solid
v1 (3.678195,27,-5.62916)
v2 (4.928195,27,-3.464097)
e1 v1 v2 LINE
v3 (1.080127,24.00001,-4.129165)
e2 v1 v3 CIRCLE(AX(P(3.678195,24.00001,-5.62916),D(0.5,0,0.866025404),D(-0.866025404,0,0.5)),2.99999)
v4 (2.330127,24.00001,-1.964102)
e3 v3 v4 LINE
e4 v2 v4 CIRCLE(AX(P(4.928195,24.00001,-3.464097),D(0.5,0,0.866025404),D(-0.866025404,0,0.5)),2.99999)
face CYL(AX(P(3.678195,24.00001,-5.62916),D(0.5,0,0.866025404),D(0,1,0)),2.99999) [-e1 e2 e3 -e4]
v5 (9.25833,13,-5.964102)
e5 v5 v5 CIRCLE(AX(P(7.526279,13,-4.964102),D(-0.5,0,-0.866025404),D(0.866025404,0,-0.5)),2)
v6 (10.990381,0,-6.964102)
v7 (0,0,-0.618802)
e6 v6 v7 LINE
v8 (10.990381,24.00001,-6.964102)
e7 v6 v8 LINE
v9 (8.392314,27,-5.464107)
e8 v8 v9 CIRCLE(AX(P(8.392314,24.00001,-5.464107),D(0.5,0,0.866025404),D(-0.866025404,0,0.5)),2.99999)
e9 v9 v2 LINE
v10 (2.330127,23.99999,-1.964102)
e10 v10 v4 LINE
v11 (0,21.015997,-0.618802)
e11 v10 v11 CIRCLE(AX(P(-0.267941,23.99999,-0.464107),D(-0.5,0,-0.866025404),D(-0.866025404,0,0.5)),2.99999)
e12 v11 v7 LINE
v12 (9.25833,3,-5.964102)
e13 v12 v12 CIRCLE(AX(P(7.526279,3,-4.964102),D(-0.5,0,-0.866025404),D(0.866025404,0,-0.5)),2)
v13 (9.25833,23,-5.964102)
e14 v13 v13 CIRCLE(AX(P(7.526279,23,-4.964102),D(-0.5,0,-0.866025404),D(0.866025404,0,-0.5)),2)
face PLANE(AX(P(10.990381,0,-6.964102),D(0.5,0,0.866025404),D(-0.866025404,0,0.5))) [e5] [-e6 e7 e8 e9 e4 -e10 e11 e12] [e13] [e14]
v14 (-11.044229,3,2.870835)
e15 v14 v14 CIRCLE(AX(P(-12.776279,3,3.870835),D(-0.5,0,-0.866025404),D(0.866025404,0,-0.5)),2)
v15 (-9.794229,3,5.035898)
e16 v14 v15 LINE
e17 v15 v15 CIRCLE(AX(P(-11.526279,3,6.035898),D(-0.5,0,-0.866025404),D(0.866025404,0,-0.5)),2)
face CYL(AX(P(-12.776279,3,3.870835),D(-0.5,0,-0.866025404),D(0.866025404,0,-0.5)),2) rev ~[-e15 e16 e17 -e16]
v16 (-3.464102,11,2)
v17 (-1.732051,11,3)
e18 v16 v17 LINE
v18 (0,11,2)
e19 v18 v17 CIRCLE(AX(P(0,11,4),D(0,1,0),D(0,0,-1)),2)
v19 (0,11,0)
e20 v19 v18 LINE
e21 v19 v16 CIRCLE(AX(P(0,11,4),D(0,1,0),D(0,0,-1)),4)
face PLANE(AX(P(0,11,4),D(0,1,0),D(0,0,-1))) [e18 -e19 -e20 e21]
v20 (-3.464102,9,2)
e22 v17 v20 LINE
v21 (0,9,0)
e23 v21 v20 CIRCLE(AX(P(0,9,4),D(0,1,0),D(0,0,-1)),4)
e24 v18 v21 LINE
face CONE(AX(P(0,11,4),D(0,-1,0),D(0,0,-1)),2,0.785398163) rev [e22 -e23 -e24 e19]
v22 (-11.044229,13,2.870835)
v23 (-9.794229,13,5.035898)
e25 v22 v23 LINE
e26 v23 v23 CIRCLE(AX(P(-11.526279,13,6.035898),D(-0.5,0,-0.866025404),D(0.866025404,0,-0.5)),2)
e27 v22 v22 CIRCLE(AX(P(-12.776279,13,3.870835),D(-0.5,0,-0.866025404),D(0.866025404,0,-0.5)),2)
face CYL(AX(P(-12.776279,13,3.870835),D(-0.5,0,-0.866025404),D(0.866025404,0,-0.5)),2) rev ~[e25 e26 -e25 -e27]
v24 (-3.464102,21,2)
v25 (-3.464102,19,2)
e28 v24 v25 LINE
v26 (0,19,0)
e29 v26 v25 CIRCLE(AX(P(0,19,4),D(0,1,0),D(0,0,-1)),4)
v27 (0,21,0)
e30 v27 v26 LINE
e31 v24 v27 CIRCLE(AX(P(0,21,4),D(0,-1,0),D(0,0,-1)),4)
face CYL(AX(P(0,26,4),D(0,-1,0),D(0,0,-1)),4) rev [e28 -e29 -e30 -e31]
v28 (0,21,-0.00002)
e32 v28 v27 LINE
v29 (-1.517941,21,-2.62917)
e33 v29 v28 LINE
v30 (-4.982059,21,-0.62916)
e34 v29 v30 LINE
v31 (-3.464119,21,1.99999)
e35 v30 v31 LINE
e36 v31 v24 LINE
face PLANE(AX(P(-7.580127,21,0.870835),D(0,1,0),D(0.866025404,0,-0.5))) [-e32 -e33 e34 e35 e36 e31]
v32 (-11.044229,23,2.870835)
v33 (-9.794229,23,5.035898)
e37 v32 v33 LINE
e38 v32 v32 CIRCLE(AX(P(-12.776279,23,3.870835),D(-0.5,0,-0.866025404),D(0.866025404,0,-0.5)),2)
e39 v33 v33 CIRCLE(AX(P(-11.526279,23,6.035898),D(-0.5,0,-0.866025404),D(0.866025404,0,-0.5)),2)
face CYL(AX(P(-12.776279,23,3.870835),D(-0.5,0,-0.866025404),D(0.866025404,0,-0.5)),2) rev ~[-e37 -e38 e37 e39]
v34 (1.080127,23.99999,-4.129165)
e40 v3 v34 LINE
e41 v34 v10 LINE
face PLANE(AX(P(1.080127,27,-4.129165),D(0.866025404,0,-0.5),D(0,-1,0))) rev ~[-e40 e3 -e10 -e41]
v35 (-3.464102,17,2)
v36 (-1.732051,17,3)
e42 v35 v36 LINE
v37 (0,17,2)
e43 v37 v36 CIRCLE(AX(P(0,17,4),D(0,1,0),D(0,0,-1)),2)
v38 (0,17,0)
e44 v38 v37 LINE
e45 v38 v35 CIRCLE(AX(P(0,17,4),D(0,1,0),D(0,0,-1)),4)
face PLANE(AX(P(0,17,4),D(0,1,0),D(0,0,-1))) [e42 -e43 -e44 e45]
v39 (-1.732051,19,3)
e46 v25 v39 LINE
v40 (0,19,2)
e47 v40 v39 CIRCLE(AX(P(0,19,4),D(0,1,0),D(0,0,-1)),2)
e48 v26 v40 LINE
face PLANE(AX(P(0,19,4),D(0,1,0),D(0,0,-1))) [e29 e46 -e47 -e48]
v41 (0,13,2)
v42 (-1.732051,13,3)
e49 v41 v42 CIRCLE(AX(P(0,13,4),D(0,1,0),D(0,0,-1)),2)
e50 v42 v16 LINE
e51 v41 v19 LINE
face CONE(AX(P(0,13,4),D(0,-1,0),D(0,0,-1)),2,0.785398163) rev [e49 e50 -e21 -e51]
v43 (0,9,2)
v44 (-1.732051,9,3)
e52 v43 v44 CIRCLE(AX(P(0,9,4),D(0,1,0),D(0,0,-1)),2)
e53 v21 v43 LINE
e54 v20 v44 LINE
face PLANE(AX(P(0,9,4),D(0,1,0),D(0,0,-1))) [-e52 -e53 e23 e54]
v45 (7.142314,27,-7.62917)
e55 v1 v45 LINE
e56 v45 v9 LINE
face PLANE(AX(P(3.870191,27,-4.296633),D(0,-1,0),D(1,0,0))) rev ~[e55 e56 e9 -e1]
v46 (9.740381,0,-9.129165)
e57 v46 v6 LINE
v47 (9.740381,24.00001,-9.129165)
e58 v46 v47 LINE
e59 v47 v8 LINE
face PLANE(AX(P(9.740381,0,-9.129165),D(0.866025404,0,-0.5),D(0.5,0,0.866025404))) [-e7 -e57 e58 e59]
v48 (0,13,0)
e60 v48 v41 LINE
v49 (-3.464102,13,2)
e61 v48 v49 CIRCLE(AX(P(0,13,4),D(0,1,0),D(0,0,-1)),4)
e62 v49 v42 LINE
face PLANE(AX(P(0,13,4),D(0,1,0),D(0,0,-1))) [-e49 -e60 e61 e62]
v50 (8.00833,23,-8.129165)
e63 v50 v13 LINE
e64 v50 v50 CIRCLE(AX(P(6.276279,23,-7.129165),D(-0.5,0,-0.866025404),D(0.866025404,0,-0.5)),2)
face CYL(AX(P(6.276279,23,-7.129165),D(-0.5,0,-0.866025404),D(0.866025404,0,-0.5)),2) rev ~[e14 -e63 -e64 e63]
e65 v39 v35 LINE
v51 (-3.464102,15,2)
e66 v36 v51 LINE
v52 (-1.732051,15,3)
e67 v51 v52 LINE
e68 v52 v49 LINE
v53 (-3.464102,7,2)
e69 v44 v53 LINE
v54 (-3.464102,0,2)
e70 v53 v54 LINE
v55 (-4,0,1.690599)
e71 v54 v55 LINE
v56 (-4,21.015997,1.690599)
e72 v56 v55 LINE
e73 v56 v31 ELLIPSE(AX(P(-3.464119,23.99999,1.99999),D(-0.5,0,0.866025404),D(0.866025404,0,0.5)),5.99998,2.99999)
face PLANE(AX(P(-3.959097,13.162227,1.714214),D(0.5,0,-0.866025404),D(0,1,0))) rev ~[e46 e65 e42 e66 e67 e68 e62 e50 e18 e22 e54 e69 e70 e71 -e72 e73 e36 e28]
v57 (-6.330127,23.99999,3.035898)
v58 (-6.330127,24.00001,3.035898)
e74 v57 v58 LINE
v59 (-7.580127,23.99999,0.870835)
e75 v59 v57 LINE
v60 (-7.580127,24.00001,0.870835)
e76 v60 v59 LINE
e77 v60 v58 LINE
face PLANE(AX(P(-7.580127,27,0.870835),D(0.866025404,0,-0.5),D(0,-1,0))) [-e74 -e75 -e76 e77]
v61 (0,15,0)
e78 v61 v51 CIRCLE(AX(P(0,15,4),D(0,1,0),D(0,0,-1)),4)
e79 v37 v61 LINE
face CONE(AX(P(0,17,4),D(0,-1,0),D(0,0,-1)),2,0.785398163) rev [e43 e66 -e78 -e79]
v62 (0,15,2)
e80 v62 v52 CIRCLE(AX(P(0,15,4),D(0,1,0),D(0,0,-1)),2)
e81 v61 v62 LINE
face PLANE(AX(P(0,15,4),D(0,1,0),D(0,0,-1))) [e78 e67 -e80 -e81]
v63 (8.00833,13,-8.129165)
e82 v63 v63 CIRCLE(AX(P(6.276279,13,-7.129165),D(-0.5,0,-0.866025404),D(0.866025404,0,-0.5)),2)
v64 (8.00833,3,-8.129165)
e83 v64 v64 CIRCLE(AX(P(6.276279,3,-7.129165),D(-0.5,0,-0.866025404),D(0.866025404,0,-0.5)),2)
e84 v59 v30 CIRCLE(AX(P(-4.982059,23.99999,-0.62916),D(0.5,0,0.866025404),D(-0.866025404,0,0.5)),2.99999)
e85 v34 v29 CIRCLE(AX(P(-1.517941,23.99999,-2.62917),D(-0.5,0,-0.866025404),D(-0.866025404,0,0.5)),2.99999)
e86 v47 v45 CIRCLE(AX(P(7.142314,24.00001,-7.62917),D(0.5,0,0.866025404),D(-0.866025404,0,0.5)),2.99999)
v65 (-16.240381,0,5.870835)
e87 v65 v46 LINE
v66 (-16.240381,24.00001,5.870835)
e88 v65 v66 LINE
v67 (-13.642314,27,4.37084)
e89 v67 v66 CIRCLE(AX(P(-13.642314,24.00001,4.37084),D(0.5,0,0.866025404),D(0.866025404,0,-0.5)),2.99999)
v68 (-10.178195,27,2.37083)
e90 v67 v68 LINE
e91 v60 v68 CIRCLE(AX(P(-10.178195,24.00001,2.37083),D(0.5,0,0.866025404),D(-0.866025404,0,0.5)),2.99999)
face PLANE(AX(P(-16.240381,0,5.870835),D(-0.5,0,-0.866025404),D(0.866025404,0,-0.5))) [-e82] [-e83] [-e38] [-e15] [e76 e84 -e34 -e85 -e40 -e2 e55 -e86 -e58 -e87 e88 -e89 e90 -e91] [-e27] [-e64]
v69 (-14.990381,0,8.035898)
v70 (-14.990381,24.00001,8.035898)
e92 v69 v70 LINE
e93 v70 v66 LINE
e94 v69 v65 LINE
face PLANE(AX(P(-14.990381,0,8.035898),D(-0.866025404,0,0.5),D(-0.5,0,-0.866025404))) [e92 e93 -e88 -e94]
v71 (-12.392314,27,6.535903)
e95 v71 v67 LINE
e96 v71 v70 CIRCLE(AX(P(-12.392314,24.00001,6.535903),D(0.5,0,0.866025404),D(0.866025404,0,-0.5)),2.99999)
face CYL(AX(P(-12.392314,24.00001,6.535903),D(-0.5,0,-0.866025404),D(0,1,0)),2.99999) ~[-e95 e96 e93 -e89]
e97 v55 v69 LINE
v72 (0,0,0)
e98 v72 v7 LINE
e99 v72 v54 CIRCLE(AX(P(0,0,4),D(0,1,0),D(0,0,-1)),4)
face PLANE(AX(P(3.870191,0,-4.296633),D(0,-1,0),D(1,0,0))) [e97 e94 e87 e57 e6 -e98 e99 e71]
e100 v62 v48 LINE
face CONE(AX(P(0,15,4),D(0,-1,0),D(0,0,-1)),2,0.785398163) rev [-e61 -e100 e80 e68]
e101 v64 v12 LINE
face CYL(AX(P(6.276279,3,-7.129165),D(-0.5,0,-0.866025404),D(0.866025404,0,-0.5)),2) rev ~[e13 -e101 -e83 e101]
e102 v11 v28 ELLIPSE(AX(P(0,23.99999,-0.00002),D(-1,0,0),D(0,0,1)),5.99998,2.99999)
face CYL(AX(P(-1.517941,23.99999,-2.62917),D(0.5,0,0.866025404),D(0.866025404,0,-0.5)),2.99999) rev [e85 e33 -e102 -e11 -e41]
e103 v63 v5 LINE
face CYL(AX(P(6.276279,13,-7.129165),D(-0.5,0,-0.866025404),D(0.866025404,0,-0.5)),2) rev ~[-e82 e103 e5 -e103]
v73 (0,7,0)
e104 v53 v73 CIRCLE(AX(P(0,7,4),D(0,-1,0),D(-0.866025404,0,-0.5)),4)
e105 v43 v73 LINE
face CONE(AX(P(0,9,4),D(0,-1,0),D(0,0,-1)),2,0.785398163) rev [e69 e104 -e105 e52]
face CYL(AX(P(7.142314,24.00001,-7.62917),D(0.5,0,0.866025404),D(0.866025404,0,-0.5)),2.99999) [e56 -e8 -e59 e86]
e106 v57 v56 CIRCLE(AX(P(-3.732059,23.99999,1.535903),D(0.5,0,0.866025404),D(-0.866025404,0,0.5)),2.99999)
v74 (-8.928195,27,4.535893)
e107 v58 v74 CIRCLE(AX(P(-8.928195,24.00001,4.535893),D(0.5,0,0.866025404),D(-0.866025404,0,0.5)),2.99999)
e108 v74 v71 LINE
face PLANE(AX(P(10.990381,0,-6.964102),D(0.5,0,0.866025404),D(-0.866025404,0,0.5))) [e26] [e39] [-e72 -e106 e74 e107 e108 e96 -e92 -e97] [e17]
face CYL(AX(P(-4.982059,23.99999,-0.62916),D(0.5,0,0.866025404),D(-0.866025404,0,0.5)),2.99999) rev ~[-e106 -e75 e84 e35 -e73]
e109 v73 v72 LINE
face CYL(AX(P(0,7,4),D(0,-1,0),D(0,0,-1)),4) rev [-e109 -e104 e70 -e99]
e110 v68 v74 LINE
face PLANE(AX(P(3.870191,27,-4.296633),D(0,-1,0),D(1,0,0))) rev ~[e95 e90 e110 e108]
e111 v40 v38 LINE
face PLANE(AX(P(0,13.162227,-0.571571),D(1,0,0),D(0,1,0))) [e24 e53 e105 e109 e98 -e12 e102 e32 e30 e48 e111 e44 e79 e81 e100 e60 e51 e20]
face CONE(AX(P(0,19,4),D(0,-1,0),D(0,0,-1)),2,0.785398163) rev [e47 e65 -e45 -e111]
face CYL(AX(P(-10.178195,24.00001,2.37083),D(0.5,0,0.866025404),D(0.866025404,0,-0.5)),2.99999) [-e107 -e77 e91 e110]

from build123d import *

# Parameters (mm, degrees)
F1_ANGLE = 60
F3_DEPTH = 27
F4_R     = 2
F5_DEPTH = 15.4913810568
F6_W     = 10
F6_H     = 6
F7_DEPTH = 15.4913810568
F8_R     = 2.99999


# Not quite as in the source:
# - a fillet or chamfer is up to 0.001 mm smaller than in the source, because OpenCascade refuses the exact size


with BuildPart() as f1:
    # F0 (on Right) → F1 (revolve)
    with BuildSketch(Plane.YZ):
        Polygon((7, 0), (0, 0), (0, -2.5), (26, -2.5), (26, 0), (19, 0), (19, 2), (17, 0), (17, 2), (15, 0), (15, 2), (13, 0), (13, 2), (11, 0), (11, 2), (9, 0), (9, 2), align=None)
    revolve(axis=Axis((0, 13.3030909821, 4), (0, 1, 0)), revolution_arc=F1_ANGLE)

    # F2 (on face) → F3 (join)
    with BuildSketch(Plane.XZ):
        Polygon((10.9903810568, -6.9641016151), (-2, 0.5358983849), (-3.25, -1.6291651246), (9.7403810568, -9.1291651246), align=None)
        Polygon((-3.25, -1.6291651246), (-2, 0.5358983849), (-14.9903810568, 8.0358983849), (-16.2403810568, 5.8708348754), align=None)
    extrude(amount=-F3_DEPTH)

    # F4 (on face) → F5 (cut, through all)
    with BuildSketch(Plane(origin=(-1.5179491924, 0, -2.6291651246), x_dir=(0.8660254038, 0, -0.5), z_dir=(-0.5, 0, -0.8660254038))):
        with Locations((-13, -3)):
            Circle(F4_R)
        with Locations((9, -3)):
            Circle(F4_R)
        with Locations((-13, -13)):
            Circle(F4_R)
        with Locations((9, -13)):
            Circle(F4_R)
        with Locations((-13, -23)):
            Circle(F4_R)
        with Locations((9, -23)):
            Circle(F4_R)
    extrude(amount=-F5_DEPTH, mode=Mode.SUBTRACT)

    # F6 (on face) → F7 (cut, through all)
    with BuildSketch(Plane(origin=(-1.5179491924, 0, -2.6291651246), x_dir=(0.8660254038, 0, -0.5), z_dir=(-0.5, 0, -0.8660254038))):
        with Locations((-2, -24)):
            Rectangle(F6_W, F6_H)
    extrude(amount=-F7_DEPTH, mode=Mode.SUBTRACT)

    # F8 (radius 3 in the source; OpenCascade refuses exactly that, so slightly less here)
    f8_edges = [f1.edges().sort_by_distance(p)[0] for p in [
        (1.705127, 21, -3.046633),
        (1.705127, 27, -3.046633),
        (-6.955127, 27, 1.953367),
        (-6.955127, 21, 1.953367),
        (-15.615381, 27, 6.953367),
        (10.365381, 27, -8.046633),
    ]]
    fillet(f8_edges, radius=F8_R)


solid = f1.part
